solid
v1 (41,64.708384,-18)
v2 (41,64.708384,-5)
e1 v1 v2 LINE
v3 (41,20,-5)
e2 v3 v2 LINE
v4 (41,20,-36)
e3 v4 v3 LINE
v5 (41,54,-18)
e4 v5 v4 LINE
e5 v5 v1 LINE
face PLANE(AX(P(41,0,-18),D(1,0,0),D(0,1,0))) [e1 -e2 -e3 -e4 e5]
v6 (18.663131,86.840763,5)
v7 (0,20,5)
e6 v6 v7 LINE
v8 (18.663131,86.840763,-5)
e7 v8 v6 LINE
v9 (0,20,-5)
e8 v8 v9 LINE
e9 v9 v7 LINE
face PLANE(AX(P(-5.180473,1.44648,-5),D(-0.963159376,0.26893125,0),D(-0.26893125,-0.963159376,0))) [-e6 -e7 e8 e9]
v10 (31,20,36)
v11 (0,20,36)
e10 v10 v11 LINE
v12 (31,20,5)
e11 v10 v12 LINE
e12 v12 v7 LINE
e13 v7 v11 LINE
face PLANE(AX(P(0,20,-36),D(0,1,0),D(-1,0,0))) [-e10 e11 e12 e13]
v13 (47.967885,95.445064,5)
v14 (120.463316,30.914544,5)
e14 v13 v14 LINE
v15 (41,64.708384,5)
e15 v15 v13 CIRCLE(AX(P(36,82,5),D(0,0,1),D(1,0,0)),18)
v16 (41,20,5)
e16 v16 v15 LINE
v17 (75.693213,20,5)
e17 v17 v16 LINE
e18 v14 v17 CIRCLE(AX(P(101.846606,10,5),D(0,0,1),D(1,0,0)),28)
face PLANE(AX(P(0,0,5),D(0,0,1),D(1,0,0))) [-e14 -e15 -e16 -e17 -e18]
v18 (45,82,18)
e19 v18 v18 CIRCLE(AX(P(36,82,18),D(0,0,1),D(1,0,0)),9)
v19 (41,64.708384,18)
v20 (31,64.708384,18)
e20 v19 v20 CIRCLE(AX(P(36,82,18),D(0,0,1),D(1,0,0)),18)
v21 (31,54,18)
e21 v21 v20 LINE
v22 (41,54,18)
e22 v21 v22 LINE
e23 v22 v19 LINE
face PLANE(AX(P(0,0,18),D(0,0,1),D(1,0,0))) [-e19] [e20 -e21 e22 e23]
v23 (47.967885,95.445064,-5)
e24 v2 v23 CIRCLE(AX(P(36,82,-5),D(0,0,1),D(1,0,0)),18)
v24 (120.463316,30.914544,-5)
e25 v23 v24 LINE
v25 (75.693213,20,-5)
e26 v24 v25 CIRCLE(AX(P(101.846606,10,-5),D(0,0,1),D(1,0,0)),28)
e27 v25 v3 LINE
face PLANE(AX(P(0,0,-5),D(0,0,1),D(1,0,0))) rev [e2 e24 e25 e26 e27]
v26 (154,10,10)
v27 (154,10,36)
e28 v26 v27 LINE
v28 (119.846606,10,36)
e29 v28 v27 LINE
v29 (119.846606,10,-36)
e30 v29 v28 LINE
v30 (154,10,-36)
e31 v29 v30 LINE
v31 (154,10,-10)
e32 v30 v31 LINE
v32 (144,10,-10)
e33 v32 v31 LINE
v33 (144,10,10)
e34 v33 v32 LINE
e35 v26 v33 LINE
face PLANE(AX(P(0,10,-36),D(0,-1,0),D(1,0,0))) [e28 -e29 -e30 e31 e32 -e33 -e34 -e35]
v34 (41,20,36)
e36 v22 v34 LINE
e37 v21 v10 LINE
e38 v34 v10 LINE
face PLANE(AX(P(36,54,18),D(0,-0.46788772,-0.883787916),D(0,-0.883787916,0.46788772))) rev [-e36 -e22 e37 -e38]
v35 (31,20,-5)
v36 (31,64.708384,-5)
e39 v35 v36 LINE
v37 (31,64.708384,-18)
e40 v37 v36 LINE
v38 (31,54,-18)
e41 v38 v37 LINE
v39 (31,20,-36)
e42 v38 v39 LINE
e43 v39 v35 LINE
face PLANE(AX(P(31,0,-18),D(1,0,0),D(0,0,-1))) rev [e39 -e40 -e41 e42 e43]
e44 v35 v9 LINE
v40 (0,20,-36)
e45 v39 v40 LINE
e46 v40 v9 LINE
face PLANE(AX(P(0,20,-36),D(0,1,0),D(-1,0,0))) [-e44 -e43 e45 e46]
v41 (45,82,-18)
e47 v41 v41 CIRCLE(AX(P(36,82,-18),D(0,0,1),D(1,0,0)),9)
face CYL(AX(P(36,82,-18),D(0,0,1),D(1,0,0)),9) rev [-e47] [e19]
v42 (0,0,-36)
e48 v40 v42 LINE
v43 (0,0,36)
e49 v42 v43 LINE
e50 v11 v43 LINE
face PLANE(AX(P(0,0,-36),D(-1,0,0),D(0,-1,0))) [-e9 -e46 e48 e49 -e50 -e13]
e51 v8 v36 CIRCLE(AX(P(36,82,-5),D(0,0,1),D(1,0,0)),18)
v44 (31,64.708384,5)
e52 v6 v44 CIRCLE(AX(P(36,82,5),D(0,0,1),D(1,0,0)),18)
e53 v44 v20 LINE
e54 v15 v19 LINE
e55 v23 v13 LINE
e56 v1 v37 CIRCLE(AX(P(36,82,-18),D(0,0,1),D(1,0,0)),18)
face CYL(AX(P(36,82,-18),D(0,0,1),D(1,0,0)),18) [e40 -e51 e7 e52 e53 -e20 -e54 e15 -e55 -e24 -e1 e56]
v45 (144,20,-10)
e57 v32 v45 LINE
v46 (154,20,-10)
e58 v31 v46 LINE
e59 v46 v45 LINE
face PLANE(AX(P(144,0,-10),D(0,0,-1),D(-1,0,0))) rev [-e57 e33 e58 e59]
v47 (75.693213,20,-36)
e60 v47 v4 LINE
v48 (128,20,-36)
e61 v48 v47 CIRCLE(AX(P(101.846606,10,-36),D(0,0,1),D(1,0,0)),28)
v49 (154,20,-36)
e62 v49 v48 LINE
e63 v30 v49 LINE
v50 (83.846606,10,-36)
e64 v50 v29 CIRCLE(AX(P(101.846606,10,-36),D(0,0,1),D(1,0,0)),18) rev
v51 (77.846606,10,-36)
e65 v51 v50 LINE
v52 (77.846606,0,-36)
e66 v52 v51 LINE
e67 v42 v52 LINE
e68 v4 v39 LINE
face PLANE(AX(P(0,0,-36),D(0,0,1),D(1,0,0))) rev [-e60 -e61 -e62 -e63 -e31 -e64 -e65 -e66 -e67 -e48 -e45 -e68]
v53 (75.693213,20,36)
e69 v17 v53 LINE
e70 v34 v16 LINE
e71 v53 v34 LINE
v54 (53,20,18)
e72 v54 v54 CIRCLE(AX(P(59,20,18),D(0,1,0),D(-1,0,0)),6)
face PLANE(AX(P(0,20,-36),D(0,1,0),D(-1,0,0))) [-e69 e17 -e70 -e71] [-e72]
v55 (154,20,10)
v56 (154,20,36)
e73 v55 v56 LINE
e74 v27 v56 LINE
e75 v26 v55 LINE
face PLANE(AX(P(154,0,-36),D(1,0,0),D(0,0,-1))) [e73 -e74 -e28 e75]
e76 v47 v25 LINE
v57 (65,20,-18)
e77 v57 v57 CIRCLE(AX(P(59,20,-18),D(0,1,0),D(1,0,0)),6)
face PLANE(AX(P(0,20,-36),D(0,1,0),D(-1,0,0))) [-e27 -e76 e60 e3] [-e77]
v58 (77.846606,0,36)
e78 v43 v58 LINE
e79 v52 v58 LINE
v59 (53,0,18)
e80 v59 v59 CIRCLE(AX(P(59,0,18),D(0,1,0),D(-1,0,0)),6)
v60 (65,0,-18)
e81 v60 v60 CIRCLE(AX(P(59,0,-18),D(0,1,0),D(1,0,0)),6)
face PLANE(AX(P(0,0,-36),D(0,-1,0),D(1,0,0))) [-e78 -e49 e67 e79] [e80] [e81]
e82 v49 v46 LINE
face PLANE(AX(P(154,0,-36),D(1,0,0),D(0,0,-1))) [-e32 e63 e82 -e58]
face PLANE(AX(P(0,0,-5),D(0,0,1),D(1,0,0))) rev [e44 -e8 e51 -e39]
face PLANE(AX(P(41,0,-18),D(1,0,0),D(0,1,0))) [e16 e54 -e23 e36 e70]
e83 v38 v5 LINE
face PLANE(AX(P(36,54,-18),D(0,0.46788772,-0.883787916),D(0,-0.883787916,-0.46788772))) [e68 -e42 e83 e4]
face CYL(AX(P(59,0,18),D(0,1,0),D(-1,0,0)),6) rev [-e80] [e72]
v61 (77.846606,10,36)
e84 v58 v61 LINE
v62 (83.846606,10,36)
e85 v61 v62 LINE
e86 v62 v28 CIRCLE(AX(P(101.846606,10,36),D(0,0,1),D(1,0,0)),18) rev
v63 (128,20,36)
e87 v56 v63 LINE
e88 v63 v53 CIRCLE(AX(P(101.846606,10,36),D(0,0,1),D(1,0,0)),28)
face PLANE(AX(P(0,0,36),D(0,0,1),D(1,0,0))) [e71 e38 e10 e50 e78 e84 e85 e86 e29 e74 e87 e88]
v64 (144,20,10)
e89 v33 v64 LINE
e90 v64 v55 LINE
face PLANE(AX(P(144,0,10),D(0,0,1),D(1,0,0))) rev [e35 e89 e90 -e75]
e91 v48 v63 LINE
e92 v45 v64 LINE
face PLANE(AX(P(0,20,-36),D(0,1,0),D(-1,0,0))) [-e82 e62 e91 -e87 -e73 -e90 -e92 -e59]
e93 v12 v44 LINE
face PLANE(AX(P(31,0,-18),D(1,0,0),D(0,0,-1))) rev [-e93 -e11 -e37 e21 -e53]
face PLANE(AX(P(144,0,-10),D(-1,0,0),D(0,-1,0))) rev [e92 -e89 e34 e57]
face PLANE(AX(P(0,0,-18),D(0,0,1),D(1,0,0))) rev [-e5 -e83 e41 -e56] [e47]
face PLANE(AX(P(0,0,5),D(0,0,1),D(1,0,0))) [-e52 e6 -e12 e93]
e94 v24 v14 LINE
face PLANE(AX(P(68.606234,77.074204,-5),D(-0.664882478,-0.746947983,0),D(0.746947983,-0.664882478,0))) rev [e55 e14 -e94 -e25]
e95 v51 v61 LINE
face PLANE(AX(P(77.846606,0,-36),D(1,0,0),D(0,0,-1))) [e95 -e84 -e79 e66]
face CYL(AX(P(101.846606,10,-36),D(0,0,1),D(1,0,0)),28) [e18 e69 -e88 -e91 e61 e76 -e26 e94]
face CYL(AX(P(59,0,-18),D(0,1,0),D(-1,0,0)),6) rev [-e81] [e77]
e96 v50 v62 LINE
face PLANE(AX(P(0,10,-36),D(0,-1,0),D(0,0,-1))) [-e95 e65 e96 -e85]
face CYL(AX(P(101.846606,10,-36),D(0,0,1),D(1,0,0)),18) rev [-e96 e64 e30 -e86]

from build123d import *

# Parameters (mm, degrees)
BOSS_EXTRUDE1_DEPTH      = 36
BOSS_EXTRUDE1_DEPTH_BACK = 36
BOSS_EXTRUDE2_DEPTH      = 18
BOSS_EXTRUDE2_DEPTH_BACK = 18
SKETCH2_3_R              = 9
BOSS_EXTRUDE3_DEPTH      = 5
BOSS_EXTRUDE3_DEPTH_BACK = 5
SKETCH2_4_W              = 5
SKETCH2_4_H              = 34
SKETCH3_W                = 10
SKETCH3_H                = 20
CUT_EXTRUDE1_DEPTH       = 178.234308191
RIB1_START               = -5
RIB1_DEPTH               = 10
SKETCH5_R                = 6
CUT_EXTRUDE2_DEPTH       = 178.234308191


# Read off the part's stored shape, not the designer's step: Rib1
with BuildPart() as part:
    # Sketch2 → Boss-Extrude1 (new, two sides: drawn at the far end of the back side and taken through both)
    with BuildSketch(Plane.XY.offset(-BOSS_EXTRUDE1_DEPTH_BACK)):
        with BuildLine():
            Line((0, 20), (0, 0))
            Line((0, 0), (77.846606339, 0))
            Line((77.846606339, 0), (77.846606339, 10))
            Line((77.846606339, 10), (83.846606339, 10))
            ThreePointArc((83.846606339, 10), (101.846606339, 28), (119.846606339, 10))
            Line((119.846606339, 10), (154, 10))
            Line((154, 10), (154, 20))
            Line((154, 20), (128, 20))
            ThreePointArc((128, 20), (124.887273582, 25.909985951), (120.463315732, 30.914543538))
            ThreePointArc((120.463315732, 30.914543538), (95.214697292, 37.203267863), (75.693212678, 20))
            Line((75.693212678, 20), (41, 20))
            Line((41, 20), (31, 20))
            Line((31, 20), (0, 20))
        make_face()
    extrude(amount=BOSS_EXTRUDE1_DEPTH + BOSS_EXTRUDE1_DEPTH_BACK)



with BuildPart() as body_2:
    # Sketch2<3> → Boss-Extrude2 (new, two sides: drawn at the far end of the back side and taken through both)
    with BuildSketch(Plane.XY.offset(-BOSS_EXTRUDE2_DEPTH_BACK)):
        with BuildLine():
            ThreePointArc((47.96788461, 95.445063703), (30.929004292, 99.270929405), (18.663131241, 86.840762505))
            ThreePointArc((18.663131241, 86.840762505), (20.277580459, 73.236123929), (31, 64.708383534))
            Line((31, 64.708383534), (31, 54))
            Line((31, 54), (41, 54))
            Line((41, 54), (41, 64.708383534))
            ThreePointArc((41, 64.708383534), (53.55457644, 78.020446505), (47.96788461, 95.445063703))
        make_face()
        with Locations((36, 82)):
            Circle(SKETCH2_3_R, mode=Mode.SUBTRACT)
    extrude(amount=BOSS_EXTRUDE2_DEPTH + BOSS_EXTRUDE2_DEPTH_BACK)


with BuildPart() as part_1:
    add(part.part)

    add(body_2.part)  # Boss-Extrude3 merges body 2
    # Sketch2<4> → Boss-Extrude3 (add, two sides: drawn at the far end of the back side and taken through both)
    with BuildSketch(Plane.XY.offset(-BOSS_EXTRUDE3_DEPTH_BACK)):
        with BuildLine():
            Line((120.463315732, 30.914543538), (47.96788461, 95.445063703))
            ThreePointArc((47.96788461, 95.445063703), (53.55457644, 78.020446505), (41, 64.708383534))
            Line((41, 64.708383534), (41, 54))
            Line((41, 54), (41, 20))
            Line((41, 20), (75.693212678, 20))
            ThreePointArc((75.693212678, 20), (95.214697292, 37.203267863), (120.463315732, 30.914543538))
        make_face()
        with Locations((33.5, 37)):
            Rectangle(SKETCH2_4_W, SKETCH2_4_H)
        with Locations((38.5, 37)):
            Rectangle(SKETCH2_4_W, SKETCH2_4_H)
        with BuildLine():
            Line((18.663131241, 86.840762505), (0, 20))
            Line((0, 20), (31, 20))
            Line((31, 20), (31, 54))
            Line((31, 54), (31, 64.708383534))
            ThreePointArc((31, 64.708383534), (20.277580459, 73.236123929), (18.663131241, 86.840762505))
        make_face()
    extrude(amount=BOSS_EXTRUDE3_DEPTH + BOSS_EXTRUDE3_DEPTH_BACK)

    # Sketch3 → Cut-Extrude1 (cut, through all)
    with BuildSketch(Plane(origin=(0, 20, 0), x_dir=(1, 0, 0), z_dir=(0, 1, 0))):
        with Locations((149, 0)):
            Rectangle(SKETCH3_W, SKETCH3_H)
    extrude(amount=-CUT_EXTRUDE1_DEPTH, mode=Mode.SUBTRACT)

    # Rib1 outline → Rib1 (add)
    with BuildSketch(Plane.ZY.offset(-36).offset(RIB1_START)):
        Polygon((36, 20), (18, 54), (5, 54), (5, 20), align=None)
    rib1 = extrude(amount=RIB1_DEPTH)

    # Mirror1: Rib1 across plane
    add(rib1.mirror(Plane.XY))

    # Sketch5 → Cut-Extrude2 (cut, through all)
    with BuildSketch(Plane(origin=(0, 20, 0), x_dir=(1, 0, 0), z_dir=(0, 1, 0))):
        with Locations(Location((59, -18, 0), (0, 0, 180))):
            Circle(SKETCH5_R)
        with Locations((59, 18)):
            Circle(SKETCH5_R)
    extrude(amount=-CUT_EXTRUDE2_DEPTH, mode=Mode.SUBTRACT)


solid = part_1.part
